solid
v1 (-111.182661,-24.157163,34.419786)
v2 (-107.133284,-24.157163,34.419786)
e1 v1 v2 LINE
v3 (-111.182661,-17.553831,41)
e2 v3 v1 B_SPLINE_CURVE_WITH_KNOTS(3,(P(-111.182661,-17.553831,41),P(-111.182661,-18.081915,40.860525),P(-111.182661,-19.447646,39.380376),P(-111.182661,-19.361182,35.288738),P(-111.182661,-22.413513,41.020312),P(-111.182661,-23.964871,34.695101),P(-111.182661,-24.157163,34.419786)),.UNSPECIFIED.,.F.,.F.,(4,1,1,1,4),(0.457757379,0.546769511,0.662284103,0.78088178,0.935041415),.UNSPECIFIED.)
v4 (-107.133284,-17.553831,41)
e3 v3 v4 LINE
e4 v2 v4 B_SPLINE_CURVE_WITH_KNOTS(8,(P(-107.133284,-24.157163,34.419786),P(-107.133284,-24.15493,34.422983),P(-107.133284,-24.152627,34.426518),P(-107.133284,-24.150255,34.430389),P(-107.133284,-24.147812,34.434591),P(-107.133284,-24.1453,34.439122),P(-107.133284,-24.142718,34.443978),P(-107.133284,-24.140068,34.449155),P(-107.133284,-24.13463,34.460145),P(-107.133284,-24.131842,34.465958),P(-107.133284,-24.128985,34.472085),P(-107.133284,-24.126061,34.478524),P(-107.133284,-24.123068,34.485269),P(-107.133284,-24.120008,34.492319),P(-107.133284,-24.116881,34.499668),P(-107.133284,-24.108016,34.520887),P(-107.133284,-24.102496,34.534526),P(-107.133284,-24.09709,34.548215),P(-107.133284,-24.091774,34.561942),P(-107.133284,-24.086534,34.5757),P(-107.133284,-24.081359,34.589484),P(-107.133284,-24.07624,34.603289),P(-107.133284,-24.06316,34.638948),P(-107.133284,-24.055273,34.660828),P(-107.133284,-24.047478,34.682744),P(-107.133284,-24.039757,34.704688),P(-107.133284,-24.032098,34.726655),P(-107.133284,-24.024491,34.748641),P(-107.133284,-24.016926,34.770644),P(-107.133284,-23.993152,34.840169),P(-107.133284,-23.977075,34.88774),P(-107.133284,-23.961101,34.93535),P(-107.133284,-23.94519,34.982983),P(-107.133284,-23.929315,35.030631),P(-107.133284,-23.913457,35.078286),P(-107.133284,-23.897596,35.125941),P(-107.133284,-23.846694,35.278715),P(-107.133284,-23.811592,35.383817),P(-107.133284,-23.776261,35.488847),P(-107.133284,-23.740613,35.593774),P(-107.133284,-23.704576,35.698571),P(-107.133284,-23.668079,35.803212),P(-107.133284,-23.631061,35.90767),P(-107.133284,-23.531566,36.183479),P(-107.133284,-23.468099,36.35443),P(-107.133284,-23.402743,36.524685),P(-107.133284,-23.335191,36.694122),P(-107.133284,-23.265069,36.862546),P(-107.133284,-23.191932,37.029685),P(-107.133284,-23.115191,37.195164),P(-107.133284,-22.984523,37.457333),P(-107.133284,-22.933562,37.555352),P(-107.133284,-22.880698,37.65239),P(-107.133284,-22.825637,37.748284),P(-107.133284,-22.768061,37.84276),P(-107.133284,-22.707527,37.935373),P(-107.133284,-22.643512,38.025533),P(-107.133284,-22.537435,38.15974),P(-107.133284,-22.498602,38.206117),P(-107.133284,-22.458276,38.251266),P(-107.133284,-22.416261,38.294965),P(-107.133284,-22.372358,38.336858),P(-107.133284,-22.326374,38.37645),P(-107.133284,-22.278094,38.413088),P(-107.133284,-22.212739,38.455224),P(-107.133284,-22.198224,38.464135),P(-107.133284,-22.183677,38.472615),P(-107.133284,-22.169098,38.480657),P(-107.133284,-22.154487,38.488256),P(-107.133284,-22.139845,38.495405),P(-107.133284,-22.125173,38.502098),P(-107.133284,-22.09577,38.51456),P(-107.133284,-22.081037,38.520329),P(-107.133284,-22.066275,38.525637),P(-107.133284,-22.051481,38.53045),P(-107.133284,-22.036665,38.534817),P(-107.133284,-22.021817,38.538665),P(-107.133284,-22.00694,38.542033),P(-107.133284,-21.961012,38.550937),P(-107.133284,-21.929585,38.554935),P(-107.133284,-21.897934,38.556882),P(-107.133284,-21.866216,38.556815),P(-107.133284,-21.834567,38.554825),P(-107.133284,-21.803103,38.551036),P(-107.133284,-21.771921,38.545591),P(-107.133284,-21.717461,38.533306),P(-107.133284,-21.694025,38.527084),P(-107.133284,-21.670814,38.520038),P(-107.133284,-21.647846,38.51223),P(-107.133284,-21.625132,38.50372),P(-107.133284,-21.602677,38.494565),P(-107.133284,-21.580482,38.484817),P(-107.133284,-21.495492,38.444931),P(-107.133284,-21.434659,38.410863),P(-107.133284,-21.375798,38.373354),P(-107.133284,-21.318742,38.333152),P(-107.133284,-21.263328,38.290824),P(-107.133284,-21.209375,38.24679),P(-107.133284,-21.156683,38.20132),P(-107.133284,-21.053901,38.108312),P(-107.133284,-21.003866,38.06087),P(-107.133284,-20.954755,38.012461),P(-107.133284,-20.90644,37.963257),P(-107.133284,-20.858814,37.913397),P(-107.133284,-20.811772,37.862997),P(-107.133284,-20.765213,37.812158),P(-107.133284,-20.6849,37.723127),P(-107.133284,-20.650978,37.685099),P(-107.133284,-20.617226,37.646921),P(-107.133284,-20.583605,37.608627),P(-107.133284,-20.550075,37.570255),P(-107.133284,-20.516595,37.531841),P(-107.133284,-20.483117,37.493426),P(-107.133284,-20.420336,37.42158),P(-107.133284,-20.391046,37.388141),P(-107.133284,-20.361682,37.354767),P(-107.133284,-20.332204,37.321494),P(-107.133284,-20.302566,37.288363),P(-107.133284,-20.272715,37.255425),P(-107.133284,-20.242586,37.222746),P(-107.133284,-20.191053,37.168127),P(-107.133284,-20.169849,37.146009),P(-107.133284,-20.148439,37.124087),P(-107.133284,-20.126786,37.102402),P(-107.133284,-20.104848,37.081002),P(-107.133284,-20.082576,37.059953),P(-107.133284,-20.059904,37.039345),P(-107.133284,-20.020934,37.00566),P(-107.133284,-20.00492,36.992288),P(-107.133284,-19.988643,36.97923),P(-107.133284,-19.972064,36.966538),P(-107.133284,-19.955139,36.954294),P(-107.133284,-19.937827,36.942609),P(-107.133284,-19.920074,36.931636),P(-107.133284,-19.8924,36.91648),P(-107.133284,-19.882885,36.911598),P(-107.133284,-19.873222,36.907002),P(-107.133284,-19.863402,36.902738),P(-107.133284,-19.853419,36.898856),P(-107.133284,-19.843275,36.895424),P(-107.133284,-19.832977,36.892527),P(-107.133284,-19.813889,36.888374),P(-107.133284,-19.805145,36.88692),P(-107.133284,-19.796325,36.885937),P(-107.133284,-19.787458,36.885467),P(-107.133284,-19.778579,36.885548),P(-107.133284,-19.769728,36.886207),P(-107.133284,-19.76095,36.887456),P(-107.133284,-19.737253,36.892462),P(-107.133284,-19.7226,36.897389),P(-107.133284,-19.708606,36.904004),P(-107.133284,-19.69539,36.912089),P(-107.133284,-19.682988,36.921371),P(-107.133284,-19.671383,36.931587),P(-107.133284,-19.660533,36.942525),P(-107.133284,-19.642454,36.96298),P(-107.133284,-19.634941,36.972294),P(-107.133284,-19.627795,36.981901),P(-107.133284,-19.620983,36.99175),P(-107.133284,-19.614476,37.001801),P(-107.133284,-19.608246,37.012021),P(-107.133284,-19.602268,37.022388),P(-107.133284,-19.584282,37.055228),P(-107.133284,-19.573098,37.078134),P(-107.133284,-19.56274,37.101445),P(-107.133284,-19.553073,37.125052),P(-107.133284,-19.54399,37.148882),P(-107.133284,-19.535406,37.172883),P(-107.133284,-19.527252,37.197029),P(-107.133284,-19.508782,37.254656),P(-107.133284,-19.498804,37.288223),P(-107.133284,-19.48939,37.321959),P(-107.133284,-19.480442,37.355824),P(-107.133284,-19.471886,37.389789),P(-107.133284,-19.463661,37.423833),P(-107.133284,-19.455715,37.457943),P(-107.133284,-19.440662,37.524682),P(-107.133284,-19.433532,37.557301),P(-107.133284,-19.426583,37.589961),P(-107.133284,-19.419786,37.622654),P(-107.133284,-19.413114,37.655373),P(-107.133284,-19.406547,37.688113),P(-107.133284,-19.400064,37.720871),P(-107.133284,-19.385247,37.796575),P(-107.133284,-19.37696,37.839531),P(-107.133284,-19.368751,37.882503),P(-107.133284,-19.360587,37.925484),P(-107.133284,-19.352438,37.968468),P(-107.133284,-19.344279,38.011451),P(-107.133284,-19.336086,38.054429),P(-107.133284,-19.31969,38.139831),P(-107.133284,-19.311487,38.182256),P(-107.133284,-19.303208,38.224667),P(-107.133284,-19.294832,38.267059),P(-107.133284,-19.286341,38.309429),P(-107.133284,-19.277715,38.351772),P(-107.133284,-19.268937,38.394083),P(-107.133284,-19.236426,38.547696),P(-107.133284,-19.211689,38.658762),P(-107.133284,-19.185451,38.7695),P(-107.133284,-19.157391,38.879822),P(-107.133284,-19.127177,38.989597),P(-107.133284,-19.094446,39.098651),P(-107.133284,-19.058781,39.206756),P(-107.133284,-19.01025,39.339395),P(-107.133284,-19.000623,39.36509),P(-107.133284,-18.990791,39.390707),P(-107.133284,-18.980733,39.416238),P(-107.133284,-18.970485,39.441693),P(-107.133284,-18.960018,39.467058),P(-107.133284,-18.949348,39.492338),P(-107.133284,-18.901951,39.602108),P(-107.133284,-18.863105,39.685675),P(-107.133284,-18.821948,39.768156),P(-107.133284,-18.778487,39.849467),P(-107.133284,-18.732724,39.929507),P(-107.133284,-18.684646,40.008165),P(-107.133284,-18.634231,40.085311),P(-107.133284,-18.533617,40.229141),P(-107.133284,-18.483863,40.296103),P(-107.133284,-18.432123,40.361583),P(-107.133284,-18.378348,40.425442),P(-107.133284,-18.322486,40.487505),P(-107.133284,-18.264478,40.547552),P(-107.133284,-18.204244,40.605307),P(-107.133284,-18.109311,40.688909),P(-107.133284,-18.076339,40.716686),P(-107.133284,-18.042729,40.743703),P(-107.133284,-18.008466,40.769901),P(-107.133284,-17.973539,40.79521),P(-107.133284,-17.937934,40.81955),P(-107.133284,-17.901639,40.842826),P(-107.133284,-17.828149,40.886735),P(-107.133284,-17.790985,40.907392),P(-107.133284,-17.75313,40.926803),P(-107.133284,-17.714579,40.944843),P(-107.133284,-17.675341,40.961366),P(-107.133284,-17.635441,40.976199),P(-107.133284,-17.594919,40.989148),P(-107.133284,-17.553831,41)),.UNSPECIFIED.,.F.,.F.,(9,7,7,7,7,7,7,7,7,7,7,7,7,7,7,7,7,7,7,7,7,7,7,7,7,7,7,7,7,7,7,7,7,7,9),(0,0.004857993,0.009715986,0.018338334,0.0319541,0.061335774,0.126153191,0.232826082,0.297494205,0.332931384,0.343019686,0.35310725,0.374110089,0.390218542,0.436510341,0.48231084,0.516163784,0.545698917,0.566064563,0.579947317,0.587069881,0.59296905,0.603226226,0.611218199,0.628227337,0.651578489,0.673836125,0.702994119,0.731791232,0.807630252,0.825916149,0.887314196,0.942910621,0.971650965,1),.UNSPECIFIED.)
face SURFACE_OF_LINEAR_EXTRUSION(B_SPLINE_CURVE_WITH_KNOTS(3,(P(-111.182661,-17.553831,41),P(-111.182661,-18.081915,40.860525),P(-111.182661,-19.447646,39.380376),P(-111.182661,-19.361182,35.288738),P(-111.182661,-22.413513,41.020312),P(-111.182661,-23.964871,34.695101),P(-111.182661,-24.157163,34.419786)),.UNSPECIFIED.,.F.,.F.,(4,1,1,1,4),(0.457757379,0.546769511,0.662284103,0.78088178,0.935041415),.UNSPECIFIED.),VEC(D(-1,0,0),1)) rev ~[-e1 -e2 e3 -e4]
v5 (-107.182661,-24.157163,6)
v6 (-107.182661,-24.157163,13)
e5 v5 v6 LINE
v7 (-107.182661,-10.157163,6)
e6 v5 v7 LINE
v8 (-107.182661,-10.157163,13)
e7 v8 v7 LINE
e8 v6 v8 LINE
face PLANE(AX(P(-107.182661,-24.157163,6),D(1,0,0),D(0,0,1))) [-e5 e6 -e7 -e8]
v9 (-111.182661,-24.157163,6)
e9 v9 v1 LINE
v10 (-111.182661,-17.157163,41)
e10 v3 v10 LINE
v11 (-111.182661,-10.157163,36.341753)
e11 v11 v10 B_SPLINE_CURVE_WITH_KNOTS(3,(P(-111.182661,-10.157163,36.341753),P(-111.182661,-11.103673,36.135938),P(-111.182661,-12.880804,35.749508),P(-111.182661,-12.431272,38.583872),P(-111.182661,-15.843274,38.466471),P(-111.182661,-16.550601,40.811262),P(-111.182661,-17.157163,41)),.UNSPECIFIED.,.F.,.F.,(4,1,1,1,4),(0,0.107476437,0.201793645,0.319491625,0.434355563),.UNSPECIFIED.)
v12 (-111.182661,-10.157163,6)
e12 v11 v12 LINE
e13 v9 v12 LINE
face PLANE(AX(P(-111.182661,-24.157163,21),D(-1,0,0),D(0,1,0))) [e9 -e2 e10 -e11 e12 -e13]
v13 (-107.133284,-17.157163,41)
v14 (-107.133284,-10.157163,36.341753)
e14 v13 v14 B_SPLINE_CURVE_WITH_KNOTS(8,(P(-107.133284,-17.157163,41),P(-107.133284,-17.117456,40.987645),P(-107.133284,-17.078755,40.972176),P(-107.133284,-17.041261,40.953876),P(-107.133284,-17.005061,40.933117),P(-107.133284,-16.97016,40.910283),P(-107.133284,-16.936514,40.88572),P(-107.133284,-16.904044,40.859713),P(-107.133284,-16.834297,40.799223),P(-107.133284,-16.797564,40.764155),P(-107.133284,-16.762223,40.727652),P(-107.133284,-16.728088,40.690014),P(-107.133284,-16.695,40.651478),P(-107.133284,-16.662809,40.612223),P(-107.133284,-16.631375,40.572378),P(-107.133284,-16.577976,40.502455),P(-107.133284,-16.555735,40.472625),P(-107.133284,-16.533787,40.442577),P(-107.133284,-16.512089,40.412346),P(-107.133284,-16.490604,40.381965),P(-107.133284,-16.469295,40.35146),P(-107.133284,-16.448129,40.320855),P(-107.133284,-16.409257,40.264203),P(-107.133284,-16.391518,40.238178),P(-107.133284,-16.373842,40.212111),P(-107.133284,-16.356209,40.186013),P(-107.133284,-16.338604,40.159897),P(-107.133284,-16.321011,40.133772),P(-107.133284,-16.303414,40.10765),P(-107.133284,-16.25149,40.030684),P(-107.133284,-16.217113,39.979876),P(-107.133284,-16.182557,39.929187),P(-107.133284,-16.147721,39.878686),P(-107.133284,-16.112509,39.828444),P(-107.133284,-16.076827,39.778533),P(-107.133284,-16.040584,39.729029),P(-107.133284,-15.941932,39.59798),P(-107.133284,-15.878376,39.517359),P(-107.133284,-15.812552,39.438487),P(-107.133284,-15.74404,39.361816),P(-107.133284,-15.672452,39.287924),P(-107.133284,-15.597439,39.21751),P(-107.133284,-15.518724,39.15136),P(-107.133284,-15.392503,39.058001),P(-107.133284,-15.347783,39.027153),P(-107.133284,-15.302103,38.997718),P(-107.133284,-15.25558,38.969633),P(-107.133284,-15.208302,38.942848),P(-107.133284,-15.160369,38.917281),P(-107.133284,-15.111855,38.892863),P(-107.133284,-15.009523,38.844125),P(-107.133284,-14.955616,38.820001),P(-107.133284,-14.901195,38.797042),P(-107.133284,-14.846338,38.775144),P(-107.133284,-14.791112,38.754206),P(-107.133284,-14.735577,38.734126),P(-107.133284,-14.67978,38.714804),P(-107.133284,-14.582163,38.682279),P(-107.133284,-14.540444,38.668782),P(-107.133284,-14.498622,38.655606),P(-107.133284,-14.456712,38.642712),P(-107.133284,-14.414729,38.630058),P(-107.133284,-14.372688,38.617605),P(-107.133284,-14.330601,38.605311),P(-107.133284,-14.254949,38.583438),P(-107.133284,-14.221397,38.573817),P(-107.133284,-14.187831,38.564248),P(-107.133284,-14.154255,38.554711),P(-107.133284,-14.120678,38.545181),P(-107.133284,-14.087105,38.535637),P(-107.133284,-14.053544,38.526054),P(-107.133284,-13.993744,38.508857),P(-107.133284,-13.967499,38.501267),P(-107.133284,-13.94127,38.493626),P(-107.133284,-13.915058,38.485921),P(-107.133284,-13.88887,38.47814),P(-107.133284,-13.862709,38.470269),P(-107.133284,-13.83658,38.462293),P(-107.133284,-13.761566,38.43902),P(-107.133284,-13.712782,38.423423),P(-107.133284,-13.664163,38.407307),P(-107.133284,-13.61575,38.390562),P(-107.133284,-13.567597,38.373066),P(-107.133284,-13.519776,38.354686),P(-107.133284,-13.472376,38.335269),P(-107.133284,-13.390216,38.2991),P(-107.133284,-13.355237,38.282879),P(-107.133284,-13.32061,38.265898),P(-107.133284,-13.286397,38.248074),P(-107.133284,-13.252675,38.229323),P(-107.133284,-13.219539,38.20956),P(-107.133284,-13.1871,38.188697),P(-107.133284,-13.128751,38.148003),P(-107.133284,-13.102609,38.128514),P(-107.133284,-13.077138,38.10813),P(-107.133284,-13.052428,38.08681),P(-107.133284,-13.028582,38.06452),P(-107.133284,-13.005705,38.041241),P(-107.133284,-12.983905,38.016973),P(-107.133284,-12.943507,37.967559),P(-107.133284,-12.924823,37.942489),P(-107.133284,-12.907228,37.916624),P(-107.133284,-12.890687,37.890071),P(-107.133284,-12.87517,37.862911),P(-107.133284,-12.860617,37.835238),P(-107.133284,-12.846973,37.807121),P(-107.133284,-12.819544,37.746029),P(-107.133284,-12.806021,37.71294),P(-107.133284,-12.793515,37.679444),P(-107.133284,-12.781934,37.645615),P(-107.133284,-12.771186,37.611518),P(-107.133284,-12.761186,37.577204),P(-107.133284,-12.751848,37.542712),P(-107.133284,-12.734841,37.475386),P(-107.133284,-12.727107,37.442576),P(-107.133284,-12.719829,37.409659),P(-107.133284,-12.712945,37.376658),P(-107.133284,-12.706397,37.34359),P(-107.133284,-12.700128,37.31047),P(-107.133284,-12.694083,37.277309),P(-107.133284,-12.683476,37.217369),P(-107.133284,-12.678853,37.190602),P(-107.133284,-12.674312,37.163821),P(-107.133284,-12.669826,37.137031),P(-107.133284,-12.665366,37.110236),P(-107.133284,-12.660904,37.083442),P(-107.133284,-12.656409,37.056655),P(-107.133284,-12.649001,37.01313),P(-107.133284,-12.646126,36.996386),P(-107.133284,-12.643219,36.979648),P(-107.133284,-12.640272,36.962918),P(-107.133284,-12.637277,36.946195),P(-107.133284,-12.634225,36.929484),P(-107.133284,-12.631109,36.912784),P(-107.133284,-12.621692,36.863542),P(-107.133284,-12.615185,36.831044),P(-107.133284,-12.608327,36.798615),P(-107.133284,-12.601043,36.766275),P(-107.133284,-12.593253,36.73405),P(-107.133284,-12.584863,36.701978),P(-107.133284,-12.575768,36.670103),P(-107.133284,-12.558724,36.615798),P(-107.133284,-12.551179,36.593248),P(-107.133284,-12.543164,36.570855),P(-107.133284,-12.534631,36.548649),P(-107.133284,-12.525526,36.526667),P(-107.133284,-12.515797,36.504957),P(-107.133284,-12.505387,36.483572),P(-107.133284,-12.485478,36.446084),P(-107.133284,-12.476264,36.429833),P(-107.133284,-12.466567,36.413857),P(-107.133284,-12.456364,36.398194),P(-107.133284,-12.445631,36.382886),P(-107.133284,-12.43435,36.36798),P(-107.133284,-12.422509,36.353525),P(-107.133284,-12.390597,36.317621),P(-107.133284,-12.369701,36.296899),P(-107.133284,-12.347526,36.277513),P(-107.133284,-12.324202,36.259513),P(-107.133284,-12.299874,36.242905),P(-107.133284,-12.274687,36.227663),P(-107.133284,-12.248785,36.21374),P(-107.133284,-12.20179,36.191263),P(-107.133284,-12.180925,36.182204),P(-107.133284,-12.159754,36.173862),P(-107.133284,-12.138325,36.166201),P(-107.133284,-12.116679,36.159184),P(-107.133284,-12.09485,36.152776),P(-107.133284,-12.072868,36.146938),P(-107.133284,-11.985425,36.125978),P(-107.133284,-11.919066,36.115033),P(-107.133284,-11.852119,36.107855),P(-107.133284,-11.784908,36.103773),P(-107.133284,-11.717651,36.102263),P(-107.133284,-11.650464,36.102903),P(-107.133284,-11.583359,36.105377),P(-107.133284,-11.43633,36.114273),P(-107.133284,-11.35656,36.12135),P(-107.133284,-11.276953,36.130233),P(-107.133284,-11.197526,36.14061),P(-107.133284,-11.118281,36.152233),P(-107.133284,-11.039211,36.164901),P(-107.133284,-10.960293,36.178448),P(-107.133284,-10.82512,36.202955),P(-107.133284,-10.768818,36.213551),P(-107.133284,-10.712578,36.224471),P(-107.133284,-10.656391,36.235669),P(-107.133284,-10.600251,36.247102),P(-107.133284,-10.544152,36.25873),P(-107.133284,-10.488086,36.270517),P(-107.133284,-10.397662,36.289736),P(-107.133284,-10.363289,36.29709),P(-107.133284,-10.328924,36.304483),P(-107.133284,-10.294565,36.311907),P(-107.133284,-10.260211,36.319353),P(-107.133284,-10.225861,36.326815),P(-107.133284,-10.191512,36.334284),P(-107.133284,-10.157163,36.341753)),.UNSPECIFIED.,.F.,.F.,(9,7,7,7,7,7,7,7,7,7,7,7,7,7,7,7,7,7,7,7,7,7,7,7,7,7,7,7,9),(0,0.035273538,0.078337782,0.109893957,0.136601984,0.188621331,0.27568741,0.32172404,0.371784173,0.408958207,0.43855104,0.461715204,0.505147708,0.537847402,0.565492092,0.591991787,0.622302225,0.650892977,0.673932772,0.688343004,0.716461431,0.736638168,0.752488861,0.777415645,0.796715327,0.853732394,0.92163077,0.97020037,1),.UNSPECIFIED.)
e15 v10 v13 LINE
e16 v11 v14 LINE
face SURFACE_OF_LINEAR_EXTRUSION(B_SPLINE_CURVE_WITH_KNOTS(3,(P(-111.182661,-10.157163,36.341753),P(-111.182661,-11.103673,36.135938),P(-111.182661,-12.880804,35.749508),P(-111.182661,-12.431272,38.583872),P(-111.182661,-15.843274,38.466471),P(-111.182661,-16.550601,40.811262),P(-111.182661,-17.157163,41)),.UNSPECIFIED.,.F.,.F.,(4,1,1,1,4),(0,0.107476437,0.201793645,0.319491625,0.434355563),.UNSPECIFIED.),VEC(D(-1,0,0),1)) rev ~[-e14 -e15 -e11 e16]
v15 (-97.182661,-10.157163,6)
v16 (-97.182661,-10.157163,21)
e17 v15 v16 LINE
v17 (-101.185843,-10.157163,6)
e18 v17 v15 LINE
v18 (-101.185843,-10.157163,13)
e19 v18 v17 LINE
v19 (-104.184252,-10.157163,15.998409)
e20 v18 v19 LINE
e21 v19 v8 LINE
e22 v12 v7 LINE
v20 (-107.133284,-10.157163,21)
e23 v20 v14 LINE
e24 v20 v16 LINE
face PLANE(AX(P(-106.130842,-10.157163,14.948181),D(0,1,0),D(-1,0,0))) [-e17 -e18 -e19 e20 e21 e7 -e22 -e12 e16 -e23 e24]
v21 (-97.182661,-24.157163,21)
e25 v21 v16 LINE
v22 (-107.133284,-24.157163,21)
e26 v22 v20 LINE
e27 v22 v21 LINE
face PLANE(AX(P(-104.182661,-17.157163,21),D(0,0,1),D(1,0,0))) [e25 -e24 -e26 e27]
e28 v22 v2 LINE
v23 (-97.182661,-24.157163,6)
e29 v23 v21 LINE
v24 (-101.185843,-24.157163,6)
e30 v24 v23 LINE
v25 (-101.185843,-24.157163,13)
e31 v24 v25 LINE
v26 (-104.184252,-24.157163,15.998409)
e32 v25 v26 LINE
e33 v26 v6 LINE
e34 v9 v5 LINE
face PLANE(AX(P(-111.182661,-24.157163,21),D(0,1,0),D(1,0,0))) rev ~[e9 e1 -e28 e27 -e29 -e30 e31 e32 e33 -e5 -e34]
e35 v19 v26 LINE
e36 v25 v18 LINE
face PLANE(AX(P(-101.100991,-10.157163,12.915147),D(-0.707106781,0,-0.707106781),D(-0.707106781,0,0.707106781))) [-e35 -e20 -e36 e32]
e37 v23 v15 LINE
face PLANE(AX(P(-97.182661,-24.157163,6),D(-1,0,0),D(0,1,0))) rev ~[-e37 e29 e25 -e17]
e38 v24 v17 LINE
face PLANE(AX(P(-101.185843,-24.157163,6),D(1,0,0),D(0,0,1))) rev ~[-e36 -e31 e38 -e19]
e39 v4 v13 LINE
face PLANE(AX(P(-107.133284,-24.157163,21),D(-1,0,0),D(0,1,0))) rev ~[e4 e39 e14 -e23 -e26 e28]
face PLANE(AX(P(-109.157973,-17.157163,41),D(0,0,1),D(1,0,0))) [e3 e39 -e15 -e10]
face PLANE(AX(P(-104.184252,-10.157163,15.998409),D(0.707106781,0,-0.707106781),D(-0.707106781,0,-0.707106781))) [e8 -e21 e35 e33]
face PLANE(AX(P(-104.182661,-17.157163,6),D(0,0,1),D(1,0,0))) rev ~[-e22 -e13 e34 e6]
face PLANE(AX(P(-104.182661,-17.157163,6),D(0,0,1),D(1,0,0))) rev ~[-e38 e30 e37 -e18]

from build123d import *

# Parameters (mm, degrees)
F1_W        = 14
F1_H        = 14
F2_DEPTH    = 15
F3_W        = 4.0493770838
F3_H        = 14
F4_DEPTH    = 20
F6_DEPTH    = 25
F7_W        = 5.9968179464
F7_H        = 10
F8_DEPTH    = 25
F9_T1_DEPTH = 14


# Not quite as in the source:
# - a fillet or chamfer that OpenCascade refuses, or shapes differently, is made with other operations: its cross-section is extruded or revolved along the edge and cut away or added


with BuildPart() as f2:
    # F1 (on offset) → F2 (new body)
    with BuildSketch(Plane.XY.offset(6)):
        with Locations((-104.1826612949, -17.1571627557)):
            Rectangle(F1_W, F1_H)
    extrude(amount=F2_DEPTH)

    # F3 (on face) → F4 (join)
    with BuildSketch(Plane.XY.offset(21)):
        with Locations((-109.157972753, -17.1571627557)):
            Rectangle(F3_W, F3_H)
    extrude(amount=F4_DEPTH)

    # F5 (on face) → F6 (cut)
    with BuildSketch(Plane(origin=(-111.1826612949, 0, 0), x_dir=(0, -1, 0), z_dir=(-1, 0, 0))):
        with BuildLine():
            Line((10.1571627557, 41), (10.1571627557, 36.341752857))
            add(Edge.make_bspline(
                [(10.1571627557, 36.341752857), (11.1036728702, 36.1359380459), (12.8808040357, 35.7495080338), (12.4312722311, 38.5838720764), (15.8432736879, 38.466470991), (16.5506011139, 40.811261571), (17.1571627557, 41)],
                knots=[0, 0, 0, 0, 0.1074764373, 0.2017936453, 0.3194916252, 0.4343555632, 0.4343555632, 0.4343555632, 0.4343555632], degree=3))
            Line((17.1571627557, 41), (10.1571627557, 41))
        make_face()
        with BuildLine():
            add(Edge.make_bspline(
                [(17.1571627557, 41), (17.2807406542, 41.0384526432), (17.4149947295, 41.0366686909), (17.5538311602, 41)],
                knots=[0.4343555632, 0.4343555632, 0.4343555632, 0.4343555632, 0.4577573794, 0.4577573794, 0.4577573794, 0.4577573794], degree=3))
            Line((17.1571627557, 41), (17.5538311602, 41))
        make_face()
        with BuildLine():
            Line((24.1571627557, 41), (17.5538311602, 41))
            add(Edge.make_bspline(
                [(17.5538311602, 41), (18.0819152443, 40.860525426), (19.4476463077, 39.3803759727), (19.3611823544, 35.2887382601), (22.4135127849, 41.0203121515), (23.9648709709, 34.6951006825), (24.1571627557, 34.419786185)],
                knots=[0.4577573794, 0.4577573794, 0.4577573794, 0.4577573794, 0.5467695113, 0.6622841032, 0.7808817799, 0.9350414154, 0.9350414154, 0.9350414154, 0.9350414154], degree=3))
            Line((24.1571627557, 34.419786185), (24.1571627557, 35.2434851229))
            Line((24.1571627557, 35.2434851229), (24.1571627557, 41))
        make_face()
    extrude(amount=-F6_DEPTH, mode=Mode.SUBTRACT)

    # F7 (on face) → F8 (cut)
    with BuildSketch(Plane.XZ.offset(24.1571627557)):
        with Locations((-104.1842523217, 11)):
            Rectangle(F7_W, F7_H)
    extrude(amount=-F8_DEPTH, mode=Mode.SUBTRACT)

    # F9: chamfer of 3 on 2 edges, made by hand

    # F9_s2 → F9_t1 (join)
    with BuildSketch(Plane.XZ.offset(10.1571627557)):
        with BuildLine():
            Line((-104.0978084812, 16.0848528137), (-107.2675141087, 12.9151471863))
            Line((-107.2675141087, 12.9151471863), (-107.3275141087, 12.9151471863))
            ThreePointArc((-107.3275141087, 12.9151471863), (-107.2426612949, 14.4575735931), (-107.2426612949, 16))
            Line((-107.2426612949, 16), (-107.1826612949, 16.06))
            ThreePointArc((-107.1826612949, 16.06), (-105.6402348881, 16.06), (-104.0978084812, 16.1448528137))
            Line((-104.0978084812, 16.1448528137), (-104.0978084812, 16.0848528137))
        make_face()
        with BuildLine():
            Line((-101.1009905348, 12.9151471863), (-104.2706961622, 16.0848528137))
            Line((-104.2706961622, 16.0848528137), (-104.2706961622, 16.1448528137))
            ThreePointArc((-104.2706961622, 16.1448528137), (-102.7282697554, 16.06), (-101.1858433485, 16.06))
            Line((-101.1858433485, 16.06), (-101.1258433485, 16))
            ThreePointArc((-101.1258433485, 16), (-101.1258433485, 14.4575735931), (-101.0409905348, 12.9151471863))
            Line((-101.0409905348, 12.9151471863), (-101.1009905348, 12.9151471863))
        make_face()
    extrude(amount=F9_T1_DEPTH)


solid = f2.part
